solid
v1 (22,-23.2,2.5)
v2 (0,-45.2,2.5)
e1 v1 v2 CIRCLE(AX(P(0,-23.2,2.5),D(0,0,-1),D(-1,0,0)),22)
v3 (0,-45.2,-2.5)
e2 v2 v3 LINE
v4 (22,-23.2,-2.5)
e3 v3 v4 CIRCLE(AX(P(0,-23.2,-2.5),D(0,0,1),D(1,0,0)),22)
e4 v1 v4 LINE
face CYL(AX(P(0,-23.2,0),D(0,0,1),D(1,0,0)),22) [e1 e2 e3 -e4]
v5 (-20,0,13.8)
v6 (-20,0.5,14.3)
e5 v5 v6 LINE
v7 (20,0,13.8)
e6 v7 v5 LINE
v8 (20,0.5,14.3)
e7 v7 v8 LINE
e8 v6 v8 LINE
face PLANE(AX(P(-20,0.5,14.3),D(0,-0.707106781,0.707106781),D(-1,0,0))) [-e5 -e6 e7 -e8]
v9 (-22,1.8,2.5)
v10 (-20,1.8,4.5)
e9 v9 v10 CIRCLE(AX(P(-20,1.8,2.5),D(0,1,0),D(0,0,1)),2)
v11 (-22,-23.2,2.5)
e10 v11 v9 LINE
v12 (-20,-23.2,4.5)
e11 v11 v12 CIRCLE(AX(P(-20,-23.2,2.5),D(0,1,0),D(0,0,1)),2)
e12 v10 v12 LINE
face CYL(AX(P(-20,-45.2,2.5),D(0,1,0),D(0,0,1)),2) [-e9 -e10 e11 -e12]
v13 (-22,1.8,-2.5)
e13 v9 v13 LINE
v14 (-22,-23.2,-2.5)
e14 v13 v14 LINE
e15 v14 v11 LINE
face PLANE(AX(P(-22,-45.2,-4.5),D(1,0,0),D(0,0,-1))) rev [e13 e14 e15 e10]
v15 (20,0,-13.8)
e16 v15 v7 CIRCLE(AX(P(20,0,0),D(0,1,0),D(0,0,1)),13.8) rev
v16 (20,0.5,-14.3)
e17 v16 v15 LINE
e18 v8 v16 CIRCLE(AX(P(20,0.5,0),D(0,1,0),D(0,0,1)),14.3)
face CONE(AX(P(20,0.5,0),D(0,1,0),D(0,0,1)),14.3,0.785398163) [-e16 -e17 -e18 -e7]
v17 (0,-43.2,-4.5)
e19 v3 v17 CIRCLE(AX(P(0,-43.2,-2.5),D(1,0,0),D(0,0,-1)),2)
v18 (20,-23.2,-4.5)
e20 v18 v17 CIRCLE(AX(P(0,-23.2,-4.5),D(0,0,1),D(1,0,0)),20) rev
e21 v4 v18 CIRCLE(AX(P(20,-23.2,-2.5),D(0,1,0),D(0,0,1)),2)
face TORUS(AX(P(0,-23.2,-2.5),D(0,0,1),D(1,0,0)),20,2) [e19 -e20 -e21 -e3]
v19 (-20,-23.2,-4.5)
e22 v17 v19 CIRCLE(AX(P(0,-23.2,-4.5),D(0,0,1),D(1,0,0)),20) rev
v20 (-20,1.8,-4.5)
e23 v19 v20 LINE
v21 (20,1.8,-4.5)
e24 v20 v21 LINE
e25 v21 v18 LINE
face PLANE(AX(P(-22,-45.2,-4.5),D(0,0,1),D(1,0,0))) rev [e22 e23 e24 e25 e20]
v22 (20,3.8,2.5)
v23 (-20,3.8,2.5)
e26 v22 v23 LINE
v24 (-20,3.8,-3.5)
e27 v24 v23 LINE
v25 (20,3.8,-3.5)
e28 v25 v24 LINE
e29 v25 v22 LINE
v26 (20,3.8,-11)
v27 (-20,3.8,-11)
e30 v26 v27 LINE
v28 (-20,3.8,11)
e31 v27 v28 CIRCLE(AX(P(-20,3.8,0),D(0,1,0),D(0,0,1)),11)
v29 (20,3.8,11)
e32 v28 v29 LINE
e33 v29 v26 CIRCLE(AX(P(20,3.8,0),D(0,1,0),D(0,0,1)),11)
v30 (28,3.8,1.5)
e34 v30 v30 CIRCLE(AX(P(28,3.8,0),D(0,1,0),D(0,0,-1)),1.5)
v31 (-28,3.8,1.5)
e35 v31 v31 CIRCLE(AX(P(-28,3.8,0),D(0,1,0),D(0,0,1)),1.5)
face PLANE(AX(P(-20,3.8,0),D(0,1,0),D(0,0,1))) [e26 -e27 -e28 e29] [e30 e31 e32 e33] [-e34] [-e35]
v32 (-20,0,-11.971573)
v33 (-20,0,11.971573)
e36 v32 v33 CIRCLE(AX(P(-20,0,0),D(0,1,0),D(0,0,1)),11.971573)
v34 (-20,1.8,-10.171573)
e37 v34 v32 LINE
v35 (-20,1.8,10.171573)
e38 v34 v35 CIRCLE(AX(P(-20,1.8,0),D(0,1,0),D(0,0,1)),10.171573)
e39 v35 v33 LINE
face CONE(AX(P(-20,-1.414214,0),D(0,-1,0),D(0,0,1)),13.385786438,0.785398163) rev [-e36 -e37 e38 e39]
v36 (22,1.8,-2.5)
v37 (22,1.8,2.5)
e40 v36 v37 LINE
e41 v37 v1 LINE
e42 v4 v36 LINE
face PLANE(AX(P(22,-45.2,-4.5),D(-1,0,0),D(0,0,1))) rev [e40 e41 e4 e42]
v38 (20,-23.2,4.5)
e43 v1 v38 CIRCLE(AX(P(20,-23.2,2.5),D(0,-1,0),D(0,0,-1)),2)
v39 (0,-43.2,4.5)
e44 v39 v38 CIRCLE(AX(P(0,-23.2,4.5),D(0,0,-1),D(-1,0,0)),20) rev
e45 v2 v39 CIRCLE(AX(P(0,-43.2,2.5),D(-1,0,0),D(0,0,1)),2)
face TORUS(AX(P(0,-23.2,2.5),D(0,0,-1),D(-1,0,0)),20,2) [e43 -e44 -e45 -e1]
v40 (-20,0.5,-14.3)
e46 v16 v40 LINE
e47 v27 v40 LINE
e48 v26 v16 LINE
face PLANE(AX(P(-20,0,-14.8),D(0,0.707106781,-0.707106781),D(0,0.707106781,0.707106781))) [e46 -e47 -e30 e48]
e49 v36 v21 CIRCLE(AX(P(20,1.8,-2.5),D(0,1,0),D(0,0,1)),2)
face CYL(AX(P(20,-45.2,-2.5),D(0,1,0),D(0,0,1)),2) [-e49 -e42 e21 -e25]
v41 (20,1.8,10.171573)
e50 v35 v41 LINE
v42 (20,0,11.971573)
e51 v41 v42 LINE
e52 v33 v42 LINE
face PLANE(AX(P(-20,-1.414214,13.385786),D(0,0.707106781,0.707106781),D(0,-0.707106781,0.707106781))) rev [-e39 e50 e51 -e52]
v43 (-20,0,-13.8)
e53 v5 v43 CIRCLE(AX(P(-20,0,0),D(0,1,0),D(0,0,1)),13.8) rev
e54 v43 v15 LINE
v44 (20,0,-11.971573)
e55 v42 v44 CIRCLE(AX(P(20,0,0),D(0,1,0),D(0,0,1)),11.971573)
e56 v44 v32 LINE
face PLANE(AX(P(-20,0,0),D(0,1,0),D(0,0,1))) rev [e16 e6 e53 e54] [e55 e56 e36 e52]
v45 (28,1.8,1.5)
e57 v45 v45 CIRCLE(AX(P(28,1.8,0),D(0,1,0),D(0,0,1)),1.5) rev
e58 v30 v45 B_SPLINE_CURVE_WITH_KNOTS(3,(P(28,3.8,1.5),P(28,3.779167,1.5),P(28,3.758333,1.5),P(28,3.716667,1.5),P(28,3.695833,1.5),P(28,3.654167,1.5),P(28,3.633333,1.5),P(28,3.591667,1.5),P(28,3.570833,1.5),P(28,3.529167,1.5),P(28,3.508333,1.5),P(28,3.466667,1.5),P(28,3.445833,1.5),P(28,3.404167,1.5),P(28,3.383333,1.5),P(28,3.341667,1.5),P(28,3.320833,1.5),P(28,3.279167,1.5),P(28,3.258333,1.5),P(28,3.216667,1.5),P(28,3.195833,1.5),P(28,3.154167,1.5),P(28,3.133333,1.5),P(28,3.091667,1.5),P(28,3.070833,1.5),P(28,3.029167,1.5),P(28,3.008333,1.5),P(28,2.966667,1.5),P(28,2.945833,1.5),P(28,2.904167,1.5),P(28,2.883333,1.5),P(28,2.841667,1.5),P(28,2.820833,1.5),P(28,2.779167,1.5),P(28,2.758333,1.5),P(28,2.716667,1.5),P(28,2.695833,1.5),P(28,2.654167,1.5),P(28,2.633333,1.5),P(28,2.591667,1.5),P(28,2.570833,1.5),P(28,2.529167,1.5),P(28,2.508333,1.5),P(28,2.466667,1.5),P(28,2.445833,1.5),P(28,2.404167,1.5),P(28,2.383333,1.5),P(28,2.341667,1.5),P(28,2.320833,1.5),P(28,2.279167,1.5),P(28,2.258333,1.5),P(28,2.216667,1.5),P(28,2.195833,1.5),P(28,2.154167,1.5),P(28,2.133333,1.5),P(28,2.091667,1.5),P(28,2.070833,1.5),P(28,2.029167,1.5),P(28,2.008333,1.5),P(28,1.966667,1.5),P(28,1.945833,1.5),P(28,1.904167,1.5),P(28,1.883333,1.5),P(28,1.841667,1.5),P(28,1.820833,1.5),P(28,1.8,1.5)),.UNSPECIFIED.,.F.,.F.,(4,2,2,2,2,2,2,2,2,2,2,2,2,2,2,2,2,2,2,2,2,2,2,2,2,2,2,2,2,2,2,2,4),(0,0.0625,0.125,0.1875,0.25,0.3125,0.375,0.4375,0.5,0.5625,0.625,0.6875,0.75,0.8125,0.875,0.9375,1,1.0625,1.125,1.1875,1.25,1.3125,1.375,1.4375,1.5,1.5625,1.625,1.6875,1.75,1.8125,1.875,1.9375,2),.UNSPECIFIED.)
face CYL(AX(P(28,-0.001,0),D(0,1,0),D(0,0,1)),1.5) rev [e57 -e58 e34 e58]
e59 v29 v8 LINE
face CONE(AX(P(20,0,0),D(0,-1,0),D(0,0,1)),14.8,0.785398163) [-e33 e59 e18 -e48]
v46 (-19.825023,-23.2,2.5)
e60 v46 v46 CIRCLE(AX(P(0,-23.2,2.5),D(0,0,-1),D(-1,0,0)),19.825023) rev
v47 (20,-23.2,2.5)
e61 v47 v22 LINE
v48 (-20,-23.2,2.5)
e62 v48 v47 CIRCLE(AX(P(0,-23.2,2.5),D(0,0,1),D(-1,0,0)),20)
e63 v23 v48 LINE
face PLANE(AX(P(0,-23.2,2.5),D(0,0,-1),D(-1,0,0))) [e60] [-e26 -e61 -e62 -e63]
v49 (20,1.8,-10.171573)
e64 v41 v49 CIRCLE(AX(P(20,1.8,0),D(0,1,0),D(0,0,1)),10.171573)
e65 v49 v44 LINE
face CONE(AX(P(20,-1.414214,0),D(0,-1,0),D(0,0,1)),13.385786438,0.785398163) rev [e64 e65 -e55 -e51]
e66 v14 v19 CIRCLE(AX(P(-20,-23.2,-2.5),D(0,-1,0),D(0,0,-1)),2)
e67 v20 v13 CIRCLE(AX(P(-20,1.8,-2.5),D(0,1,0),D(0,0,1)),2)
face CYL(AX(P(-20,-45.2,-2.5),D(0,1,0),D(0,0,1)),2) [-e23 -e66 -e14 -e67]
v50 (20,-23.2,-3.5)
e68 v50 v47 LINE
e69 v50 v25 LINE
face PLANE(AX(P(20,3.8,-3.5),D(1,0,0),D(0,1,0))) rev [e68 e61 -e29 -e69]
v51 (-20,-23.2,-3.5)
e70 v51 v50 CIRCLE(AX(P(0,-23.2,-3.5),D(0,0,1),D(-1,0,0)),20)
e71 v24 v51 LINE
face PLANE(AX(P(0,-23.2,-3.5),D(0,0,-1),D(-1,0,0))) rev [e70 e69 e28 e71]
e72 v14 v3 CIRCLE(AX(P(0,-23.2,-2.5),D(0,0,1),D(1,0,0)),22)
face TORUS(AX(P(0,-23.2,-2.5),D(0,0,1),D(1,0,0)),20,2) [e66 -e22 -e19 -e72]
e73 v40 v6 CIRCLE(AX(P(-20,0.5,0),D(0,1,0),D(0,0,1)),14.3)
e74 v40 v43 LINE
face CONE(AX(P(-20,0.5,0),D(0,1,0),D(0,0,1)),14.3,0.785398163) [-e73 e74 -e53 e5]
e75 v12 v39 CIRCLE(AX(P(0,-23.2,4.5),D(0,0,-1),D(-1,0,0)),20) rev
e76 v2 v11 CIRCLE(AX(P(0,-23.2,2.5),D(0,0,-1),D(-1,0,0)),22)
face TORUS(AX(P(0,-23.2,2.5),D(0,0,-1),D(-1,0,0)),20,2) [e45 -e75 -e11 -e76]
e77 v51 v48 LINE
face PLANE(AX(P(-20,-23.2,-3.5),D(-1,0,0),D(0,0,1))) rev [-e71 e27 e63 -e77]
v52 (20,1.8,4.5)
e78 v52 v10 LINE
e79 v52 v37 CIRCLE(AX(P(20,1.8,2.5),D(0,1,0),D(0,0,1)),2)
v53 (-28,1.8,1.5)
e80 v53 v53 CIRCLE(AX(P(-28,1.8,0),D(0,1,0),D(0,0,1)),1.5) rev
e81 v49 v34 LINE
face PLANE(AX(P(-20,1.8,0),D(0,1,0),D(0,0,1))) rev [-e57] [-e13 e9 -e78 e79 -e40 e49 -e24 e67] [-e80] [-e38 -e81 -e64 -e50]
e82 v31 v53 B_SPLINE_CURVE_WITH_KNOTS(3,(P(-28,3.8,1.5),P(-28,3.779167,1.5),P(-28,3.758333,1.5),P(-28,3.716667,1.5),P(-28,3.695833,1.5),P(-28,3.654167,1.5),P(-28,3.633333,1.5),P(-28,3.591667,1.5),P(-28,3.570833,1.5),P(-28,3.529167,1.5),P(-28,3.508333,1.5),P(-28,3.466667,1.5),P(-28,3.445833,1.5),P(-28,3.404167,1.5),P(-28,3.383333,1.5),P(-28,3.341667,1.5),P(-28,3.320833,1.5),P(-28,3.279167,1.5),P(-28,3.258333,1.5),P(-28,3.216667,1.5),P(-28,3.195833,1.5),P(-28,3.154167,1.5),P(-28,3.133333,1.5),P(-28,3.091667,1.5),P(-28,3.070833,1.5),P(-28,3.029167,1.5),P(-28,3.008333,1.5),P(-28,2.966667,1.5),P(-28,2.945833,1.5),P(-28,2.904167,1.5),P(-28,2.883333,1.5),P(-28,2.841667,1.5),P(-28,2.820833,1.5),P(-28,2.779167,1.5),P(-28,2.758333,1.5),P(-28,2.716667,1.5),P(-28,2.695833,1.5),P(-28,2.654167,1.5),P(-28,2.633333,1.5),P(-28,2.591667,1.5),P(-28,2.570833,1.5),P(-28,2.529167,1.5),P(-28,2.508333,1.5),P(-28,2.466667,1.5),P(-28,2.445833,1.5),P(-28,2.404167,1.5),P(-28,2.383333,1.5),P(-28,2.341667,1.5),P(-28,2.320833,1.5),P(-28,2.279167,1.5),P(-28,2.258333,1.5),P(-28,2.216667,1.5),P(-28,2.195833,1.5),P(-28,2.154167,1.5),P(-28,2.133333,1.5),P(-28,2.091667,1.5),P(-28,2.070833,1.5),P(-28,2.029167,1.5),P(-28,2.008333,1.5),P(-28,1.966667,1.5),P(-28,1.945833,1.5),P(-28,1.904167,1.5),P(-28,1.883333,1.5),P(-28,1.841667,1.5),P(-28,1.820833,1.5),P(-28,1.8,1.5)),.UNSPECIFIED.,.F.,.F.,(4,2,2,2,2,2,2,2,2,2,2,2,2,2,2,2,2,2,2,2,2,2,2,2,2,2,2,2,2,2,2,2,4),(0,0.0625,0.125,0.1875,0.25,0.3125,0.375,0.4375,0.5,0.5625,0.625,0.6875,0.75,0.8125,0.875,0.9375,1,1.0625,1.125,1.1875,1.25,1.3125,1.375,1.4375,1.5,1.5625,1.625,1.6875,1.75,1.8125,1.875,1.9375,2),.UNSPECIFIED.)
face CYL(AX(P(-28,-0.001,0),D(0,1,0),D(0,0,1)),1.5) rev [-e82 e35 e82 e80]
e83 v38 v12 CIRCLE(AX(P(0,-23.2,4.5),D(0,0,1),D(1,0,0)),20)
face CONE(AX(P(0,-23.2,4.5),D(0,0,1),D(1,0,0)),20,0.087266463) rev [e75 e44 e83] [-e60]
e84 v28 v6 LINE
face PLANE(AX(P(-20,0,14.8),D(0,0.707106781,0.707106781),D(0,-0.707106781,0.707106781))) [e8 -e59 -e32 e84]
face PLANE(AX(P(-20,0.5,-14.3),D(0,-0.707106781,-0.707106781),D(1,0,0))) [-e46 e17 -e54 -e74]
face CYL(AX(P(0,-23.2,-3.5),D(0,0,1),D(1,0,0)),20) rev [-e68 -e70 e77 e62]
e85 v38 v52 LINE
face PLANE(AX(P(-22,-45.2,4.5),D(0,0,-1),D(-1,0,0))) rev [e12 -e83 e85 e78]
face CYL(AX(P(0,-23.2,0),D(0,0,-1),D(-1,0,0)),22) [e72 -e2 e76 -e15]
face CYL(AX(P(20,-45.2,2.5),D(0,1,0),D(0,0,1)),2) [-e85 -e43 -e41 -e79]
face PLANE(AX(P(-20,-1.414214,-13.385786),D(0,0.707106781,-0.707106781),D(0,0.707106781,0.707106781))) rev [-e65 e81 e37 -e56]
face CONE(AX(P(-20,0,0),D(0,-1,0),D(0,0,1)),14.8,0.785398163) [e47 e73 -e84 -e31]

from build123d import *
from OCP.BRepFilletAPI import BRepFilletAPI_MakeChamfer

# Parameters (mm, degrees)
BOSS_EXTRU_1_DEPTH      = 3.8
BOSS_EXTRU_1_TAPER      = 45
COQUE2_DEPTH            = 1.8
COQUE2_DRAFT            = 45
CHANFREIN1_SIZE         = 1
CHANFREIN1_SIZE2        = 0.707106781
ENL_V_MAT_EXTRU_1_REACH = 39.355
ESQUISSE2_R             = 1.5
ESQUISSE3_W             = 44
ESQUISSE3_H             = 9
BOSS_EXTRU_4_DEPTH      = 47
CONG_1_R                = 22
CONG_2_R                = 2
ESQUISSE7_R             = 20
ENL_V_MAT_EXTRU_4_DEPTH = 2
ENL_V_MAT_EXTRU_4_DRAFT = -5
ENL_V_MAT_EXTRU_5_DEPTH = 6


# Read off the part's stored shape, not the designer's step: Coque2
with BuildPart() as part:
    # Esquisse1 → Boss.-Extru.1 (new body)
    with BuildSketch(Plane(origin=(0, 0, 0), x_dir=(1, 0, 0), z_dir=(0, 1, 0))):
        with BuildLine():
            ThreePointArc((-20, 14.8), (-34.8, 0), (-20, -14.8))
            Line((-20, -14.8), (20, -14.8))
            ThreePointArc((20, -14.8), (34.8, 0), (20, 14.8))
            Line((20, 14.8), (-20, 14.8))
        make_face()
    extrude(amount=BOSS_EXTRU_1_DEPTH, taper=BOSS_EXTRU_1_TAPER)


with BuildPart() as coque2_tool:
    # Coque2 outline → Coque2 (with draft: the straight prism first)
    with BuildSketch(Plane(origin=(0, 1.8, 0), x_dir=(1, 0, 0), z_dir=(0, 1, 0))):
        with BuildLine():
            Line((-20, -10.171572875), (20, -10.171572875))
            ThreePointArc((20, -10.171572875), (30.171572875, 0), (20, 10.171572875))
            Line((20, 10.171572875), (-20, 10.171572875))
            ThreePointArc((-20, 10.171572875), (-30.171572875, 0), (-20, -10.171572875))
        make_face()
    extrude(amount=-COQUE2_DEPTH)
    # Coque2: the draft: its side faces are tilted about the plane it starts from
    coque2_sides = [coque2_tool.faces().sort_by_distance(p)[0] for p in [
        (0, 0.9, 10.171572875),
        (30.171572875, 0.9, 0),
        (0, 0.9, -10.171572875),
        (-30.171572875, 0.9, 0),
    ]]
    draft(coque2_sides, Plane(origin=(0, 1.8, 0), x_dir=(1, 0, 0), z_dir=(0, 1, 0)), COQUE2_DRAFT)


with BuildPart() as part_1:
    add(part.part)

    # Coque2: cut by coque2_tool
    add(coque2_tool.part, mode=Mode.SUBTRACT)

    # Chanfrein1: one chamfer whose edges measure the first distance from different faces: ONE call of the kernel's chamfer builder (chamfer() names one face for all edges)
    chanfrein1_edges_1 = [part_1.edges().sort_by_distance(p)[0] for p in [
        (0, 0, -14.8),
        (0, 0, 14.8),
        (-34.8, 0, 0),
    ]]
    chanfrein1_side_1 = [part_1.faces().sort_by_distance(p)[0] for p in [
        (0, 0, -14.043672029),
    ]]
    chanfrein1_edges_2 = [part_1.edges().sort_by_distance(p)[0] for p in [
        (34.8, 0, 0),
    ]]
    chanfrein1_side_2 = [part_1.faces().sort_by_distance(p)[0] for p in [
        (32.9, 1.9, 0),
    ]]
    chanfrein1 = BRepFilletAPI_MakeChamfer(part_1.part.solid().wrapped)
    for e in chanfrein1_edges_1:
        chanfrein1.Add(CHANFREIN1_SIZE, CHANFREIN1_SIZE2, e.wrapped, chanfrein1_side_1[0].wrapped)  # the first distance lies on this face
    for e in chanfrein1_edges_2:
        chanfrein1.Add(CHANFREIN1_SIZE, CHANFREIN1_SIZE2, e.wrapped, chanfrein1_side_2[0].wrapped)  # the first distance lies on this face
    add(Compound.cast(chanfrein1.Shape()), mode=Mode.REPLACE)

    # Esquisse2 → Enlèv. mat.-Extru.1 (cut, up to next)
    with BuildSketch(Plane(origin=(0, 3.8, 0), x_dir=(1, 0, 0), z_dir=(0, 1, 0)), mode=Mode.PRIVATE) as enl_v_mat_extru_1_sk1:
        with Locations(Location((-28, 0, 0), (0, 0, 270))):
            Circle(ESQUISSE2_R)
    enl_v_mat_extru_1_tool1 = extrude(enl_v_mat_extru_1_sk1.sketch, amount=-ENL_V_MAT_EXTRU_1_REACH, mode=Mode.PRIVATE) & part_1.part
    # Esquisse2 → Enlèv. mat.-Extru.1 (cut, up to next)
    with BuildSketch(Plane(origin=(0, 3.8, 0), x_dir=(1, 0, 0), z_dir=(0, 1, 0)), mode=Mode.PRIVATE) as enl_v_mat_extru_1_sk2:
        with Locations(Location((28, 0, 0), (0, 0, 270))):
            Circle(ESQUISSE2_R)
    enl_v_mat_extru_1_tool2 = extrude(enl_v_mat_extru_1_sk2.sketch, amount=-ENL_V_MAT_EXTRU_1_REACH, mode=Mode.PRIVATE) & part_1.part
    add(enl_v_mat_extru_1_tool1.solids().sort_by_distance((-28, 3.8, 0))[0], mode=Mode.SUBTRACT)
    add(enl_v_mat_extru_1_tool2.solids().sort_by_distance((28, 3.8, 0))[0], mode=Mode.SUBTRACT)

    # Esquisse3 → Boss.-Extru.4 (add)
    with BuildSketch(Plane.XZ.offset(-1.8)):
        Rectangle(ESQUISSE3_W, ESQUISSE3_H)
    extrude(amount=BOSS_EXTRU_4_DEPTH)

    # Congé1
    cong_1_edges = [part_1.edges().sort_by_distance(p)[0] for p in [
        (22, -45.2, 0),
        (-22, -45.2, 0),
    ]]
    fillet(cong_1_edges, radius=CONG_1_R - 0.0001)  # a hair under: the kernel refuses the full size

    # Congé2
    cong_2_edges = [part_1.edges().sort_by_distance(p)[0] for p in [
        (-22, -10.70005, 4.5),
        (22, -10.70005, 4.5),
        (-15.556378475, -38.756378475, 4.5),
        (15.556378475, -38.756378475, 4.5),
        (22, -10.70005, -4.5),
        (-22, -10.70005, -4.5),
        (-15.556378475, -38.756378475, -4.5),
        (15.556378475, -38.756378475, -4.5),
    ]]
    fillet(cong_2_edges, radius=CONG_2_R)


with BuildPart() as enl_v_mat_extru_4_tool:
    # Esquisse7 → Enlèv. mat.-Extru.4 (with draft: the straight prism first)
    with BuildSketch(Plane.XY.offset(4.5)):
        with Locations((0, -23.2)):
            Circle(ESQUISSE7_R)
    extrude(amount=-ENL_V_MAT_EXTRU_4_DEPTH)
    # Enlèv. mat.-Extru.4: the draft: its side faces are tilted about the plane it starts from
    enl_v_mat_extru_4_sides = [enl_v_mat_extru_4_tool.faces().sort_by_distance(p)[0] for p in [
        (-20, -23.2, 3.5),
    ]]
    draft(enl_v_mat_extru_4_sides, Plane.XY.offset(4.5), ENL_V_MAT_EXTRU_4_DRAFT)


with BuildPart() as part_2:
    add(part_1.part)

    # Enlèv. mat.-Extru.4: cut by enl_v_mat_extru_4_tool
    add(enl_v_mat_extru_4_tool.part, mode=Mode.SUBTRACT)

    # Esquisse9 → Enlèv. mat.-Extru.5 (cut)
    with BuildSketch(Plane.XY.offset(2.5)):
        with BuildLine():
            Line((-20, -23.2), (-20, 3.8))
            Line((-20, 3.8), (20, 3.8))
            Line((20, 3.8), (20, -23.2))
            ThreePointArc((20, -23.2), (0, -43.2), (-20, -23.2))
        make_face()
    extrude(amount=-ENL_V_MAT_EXTRU_5_DEPTH, mode=Mode.SUBTRACT)


solid = part_2.part
